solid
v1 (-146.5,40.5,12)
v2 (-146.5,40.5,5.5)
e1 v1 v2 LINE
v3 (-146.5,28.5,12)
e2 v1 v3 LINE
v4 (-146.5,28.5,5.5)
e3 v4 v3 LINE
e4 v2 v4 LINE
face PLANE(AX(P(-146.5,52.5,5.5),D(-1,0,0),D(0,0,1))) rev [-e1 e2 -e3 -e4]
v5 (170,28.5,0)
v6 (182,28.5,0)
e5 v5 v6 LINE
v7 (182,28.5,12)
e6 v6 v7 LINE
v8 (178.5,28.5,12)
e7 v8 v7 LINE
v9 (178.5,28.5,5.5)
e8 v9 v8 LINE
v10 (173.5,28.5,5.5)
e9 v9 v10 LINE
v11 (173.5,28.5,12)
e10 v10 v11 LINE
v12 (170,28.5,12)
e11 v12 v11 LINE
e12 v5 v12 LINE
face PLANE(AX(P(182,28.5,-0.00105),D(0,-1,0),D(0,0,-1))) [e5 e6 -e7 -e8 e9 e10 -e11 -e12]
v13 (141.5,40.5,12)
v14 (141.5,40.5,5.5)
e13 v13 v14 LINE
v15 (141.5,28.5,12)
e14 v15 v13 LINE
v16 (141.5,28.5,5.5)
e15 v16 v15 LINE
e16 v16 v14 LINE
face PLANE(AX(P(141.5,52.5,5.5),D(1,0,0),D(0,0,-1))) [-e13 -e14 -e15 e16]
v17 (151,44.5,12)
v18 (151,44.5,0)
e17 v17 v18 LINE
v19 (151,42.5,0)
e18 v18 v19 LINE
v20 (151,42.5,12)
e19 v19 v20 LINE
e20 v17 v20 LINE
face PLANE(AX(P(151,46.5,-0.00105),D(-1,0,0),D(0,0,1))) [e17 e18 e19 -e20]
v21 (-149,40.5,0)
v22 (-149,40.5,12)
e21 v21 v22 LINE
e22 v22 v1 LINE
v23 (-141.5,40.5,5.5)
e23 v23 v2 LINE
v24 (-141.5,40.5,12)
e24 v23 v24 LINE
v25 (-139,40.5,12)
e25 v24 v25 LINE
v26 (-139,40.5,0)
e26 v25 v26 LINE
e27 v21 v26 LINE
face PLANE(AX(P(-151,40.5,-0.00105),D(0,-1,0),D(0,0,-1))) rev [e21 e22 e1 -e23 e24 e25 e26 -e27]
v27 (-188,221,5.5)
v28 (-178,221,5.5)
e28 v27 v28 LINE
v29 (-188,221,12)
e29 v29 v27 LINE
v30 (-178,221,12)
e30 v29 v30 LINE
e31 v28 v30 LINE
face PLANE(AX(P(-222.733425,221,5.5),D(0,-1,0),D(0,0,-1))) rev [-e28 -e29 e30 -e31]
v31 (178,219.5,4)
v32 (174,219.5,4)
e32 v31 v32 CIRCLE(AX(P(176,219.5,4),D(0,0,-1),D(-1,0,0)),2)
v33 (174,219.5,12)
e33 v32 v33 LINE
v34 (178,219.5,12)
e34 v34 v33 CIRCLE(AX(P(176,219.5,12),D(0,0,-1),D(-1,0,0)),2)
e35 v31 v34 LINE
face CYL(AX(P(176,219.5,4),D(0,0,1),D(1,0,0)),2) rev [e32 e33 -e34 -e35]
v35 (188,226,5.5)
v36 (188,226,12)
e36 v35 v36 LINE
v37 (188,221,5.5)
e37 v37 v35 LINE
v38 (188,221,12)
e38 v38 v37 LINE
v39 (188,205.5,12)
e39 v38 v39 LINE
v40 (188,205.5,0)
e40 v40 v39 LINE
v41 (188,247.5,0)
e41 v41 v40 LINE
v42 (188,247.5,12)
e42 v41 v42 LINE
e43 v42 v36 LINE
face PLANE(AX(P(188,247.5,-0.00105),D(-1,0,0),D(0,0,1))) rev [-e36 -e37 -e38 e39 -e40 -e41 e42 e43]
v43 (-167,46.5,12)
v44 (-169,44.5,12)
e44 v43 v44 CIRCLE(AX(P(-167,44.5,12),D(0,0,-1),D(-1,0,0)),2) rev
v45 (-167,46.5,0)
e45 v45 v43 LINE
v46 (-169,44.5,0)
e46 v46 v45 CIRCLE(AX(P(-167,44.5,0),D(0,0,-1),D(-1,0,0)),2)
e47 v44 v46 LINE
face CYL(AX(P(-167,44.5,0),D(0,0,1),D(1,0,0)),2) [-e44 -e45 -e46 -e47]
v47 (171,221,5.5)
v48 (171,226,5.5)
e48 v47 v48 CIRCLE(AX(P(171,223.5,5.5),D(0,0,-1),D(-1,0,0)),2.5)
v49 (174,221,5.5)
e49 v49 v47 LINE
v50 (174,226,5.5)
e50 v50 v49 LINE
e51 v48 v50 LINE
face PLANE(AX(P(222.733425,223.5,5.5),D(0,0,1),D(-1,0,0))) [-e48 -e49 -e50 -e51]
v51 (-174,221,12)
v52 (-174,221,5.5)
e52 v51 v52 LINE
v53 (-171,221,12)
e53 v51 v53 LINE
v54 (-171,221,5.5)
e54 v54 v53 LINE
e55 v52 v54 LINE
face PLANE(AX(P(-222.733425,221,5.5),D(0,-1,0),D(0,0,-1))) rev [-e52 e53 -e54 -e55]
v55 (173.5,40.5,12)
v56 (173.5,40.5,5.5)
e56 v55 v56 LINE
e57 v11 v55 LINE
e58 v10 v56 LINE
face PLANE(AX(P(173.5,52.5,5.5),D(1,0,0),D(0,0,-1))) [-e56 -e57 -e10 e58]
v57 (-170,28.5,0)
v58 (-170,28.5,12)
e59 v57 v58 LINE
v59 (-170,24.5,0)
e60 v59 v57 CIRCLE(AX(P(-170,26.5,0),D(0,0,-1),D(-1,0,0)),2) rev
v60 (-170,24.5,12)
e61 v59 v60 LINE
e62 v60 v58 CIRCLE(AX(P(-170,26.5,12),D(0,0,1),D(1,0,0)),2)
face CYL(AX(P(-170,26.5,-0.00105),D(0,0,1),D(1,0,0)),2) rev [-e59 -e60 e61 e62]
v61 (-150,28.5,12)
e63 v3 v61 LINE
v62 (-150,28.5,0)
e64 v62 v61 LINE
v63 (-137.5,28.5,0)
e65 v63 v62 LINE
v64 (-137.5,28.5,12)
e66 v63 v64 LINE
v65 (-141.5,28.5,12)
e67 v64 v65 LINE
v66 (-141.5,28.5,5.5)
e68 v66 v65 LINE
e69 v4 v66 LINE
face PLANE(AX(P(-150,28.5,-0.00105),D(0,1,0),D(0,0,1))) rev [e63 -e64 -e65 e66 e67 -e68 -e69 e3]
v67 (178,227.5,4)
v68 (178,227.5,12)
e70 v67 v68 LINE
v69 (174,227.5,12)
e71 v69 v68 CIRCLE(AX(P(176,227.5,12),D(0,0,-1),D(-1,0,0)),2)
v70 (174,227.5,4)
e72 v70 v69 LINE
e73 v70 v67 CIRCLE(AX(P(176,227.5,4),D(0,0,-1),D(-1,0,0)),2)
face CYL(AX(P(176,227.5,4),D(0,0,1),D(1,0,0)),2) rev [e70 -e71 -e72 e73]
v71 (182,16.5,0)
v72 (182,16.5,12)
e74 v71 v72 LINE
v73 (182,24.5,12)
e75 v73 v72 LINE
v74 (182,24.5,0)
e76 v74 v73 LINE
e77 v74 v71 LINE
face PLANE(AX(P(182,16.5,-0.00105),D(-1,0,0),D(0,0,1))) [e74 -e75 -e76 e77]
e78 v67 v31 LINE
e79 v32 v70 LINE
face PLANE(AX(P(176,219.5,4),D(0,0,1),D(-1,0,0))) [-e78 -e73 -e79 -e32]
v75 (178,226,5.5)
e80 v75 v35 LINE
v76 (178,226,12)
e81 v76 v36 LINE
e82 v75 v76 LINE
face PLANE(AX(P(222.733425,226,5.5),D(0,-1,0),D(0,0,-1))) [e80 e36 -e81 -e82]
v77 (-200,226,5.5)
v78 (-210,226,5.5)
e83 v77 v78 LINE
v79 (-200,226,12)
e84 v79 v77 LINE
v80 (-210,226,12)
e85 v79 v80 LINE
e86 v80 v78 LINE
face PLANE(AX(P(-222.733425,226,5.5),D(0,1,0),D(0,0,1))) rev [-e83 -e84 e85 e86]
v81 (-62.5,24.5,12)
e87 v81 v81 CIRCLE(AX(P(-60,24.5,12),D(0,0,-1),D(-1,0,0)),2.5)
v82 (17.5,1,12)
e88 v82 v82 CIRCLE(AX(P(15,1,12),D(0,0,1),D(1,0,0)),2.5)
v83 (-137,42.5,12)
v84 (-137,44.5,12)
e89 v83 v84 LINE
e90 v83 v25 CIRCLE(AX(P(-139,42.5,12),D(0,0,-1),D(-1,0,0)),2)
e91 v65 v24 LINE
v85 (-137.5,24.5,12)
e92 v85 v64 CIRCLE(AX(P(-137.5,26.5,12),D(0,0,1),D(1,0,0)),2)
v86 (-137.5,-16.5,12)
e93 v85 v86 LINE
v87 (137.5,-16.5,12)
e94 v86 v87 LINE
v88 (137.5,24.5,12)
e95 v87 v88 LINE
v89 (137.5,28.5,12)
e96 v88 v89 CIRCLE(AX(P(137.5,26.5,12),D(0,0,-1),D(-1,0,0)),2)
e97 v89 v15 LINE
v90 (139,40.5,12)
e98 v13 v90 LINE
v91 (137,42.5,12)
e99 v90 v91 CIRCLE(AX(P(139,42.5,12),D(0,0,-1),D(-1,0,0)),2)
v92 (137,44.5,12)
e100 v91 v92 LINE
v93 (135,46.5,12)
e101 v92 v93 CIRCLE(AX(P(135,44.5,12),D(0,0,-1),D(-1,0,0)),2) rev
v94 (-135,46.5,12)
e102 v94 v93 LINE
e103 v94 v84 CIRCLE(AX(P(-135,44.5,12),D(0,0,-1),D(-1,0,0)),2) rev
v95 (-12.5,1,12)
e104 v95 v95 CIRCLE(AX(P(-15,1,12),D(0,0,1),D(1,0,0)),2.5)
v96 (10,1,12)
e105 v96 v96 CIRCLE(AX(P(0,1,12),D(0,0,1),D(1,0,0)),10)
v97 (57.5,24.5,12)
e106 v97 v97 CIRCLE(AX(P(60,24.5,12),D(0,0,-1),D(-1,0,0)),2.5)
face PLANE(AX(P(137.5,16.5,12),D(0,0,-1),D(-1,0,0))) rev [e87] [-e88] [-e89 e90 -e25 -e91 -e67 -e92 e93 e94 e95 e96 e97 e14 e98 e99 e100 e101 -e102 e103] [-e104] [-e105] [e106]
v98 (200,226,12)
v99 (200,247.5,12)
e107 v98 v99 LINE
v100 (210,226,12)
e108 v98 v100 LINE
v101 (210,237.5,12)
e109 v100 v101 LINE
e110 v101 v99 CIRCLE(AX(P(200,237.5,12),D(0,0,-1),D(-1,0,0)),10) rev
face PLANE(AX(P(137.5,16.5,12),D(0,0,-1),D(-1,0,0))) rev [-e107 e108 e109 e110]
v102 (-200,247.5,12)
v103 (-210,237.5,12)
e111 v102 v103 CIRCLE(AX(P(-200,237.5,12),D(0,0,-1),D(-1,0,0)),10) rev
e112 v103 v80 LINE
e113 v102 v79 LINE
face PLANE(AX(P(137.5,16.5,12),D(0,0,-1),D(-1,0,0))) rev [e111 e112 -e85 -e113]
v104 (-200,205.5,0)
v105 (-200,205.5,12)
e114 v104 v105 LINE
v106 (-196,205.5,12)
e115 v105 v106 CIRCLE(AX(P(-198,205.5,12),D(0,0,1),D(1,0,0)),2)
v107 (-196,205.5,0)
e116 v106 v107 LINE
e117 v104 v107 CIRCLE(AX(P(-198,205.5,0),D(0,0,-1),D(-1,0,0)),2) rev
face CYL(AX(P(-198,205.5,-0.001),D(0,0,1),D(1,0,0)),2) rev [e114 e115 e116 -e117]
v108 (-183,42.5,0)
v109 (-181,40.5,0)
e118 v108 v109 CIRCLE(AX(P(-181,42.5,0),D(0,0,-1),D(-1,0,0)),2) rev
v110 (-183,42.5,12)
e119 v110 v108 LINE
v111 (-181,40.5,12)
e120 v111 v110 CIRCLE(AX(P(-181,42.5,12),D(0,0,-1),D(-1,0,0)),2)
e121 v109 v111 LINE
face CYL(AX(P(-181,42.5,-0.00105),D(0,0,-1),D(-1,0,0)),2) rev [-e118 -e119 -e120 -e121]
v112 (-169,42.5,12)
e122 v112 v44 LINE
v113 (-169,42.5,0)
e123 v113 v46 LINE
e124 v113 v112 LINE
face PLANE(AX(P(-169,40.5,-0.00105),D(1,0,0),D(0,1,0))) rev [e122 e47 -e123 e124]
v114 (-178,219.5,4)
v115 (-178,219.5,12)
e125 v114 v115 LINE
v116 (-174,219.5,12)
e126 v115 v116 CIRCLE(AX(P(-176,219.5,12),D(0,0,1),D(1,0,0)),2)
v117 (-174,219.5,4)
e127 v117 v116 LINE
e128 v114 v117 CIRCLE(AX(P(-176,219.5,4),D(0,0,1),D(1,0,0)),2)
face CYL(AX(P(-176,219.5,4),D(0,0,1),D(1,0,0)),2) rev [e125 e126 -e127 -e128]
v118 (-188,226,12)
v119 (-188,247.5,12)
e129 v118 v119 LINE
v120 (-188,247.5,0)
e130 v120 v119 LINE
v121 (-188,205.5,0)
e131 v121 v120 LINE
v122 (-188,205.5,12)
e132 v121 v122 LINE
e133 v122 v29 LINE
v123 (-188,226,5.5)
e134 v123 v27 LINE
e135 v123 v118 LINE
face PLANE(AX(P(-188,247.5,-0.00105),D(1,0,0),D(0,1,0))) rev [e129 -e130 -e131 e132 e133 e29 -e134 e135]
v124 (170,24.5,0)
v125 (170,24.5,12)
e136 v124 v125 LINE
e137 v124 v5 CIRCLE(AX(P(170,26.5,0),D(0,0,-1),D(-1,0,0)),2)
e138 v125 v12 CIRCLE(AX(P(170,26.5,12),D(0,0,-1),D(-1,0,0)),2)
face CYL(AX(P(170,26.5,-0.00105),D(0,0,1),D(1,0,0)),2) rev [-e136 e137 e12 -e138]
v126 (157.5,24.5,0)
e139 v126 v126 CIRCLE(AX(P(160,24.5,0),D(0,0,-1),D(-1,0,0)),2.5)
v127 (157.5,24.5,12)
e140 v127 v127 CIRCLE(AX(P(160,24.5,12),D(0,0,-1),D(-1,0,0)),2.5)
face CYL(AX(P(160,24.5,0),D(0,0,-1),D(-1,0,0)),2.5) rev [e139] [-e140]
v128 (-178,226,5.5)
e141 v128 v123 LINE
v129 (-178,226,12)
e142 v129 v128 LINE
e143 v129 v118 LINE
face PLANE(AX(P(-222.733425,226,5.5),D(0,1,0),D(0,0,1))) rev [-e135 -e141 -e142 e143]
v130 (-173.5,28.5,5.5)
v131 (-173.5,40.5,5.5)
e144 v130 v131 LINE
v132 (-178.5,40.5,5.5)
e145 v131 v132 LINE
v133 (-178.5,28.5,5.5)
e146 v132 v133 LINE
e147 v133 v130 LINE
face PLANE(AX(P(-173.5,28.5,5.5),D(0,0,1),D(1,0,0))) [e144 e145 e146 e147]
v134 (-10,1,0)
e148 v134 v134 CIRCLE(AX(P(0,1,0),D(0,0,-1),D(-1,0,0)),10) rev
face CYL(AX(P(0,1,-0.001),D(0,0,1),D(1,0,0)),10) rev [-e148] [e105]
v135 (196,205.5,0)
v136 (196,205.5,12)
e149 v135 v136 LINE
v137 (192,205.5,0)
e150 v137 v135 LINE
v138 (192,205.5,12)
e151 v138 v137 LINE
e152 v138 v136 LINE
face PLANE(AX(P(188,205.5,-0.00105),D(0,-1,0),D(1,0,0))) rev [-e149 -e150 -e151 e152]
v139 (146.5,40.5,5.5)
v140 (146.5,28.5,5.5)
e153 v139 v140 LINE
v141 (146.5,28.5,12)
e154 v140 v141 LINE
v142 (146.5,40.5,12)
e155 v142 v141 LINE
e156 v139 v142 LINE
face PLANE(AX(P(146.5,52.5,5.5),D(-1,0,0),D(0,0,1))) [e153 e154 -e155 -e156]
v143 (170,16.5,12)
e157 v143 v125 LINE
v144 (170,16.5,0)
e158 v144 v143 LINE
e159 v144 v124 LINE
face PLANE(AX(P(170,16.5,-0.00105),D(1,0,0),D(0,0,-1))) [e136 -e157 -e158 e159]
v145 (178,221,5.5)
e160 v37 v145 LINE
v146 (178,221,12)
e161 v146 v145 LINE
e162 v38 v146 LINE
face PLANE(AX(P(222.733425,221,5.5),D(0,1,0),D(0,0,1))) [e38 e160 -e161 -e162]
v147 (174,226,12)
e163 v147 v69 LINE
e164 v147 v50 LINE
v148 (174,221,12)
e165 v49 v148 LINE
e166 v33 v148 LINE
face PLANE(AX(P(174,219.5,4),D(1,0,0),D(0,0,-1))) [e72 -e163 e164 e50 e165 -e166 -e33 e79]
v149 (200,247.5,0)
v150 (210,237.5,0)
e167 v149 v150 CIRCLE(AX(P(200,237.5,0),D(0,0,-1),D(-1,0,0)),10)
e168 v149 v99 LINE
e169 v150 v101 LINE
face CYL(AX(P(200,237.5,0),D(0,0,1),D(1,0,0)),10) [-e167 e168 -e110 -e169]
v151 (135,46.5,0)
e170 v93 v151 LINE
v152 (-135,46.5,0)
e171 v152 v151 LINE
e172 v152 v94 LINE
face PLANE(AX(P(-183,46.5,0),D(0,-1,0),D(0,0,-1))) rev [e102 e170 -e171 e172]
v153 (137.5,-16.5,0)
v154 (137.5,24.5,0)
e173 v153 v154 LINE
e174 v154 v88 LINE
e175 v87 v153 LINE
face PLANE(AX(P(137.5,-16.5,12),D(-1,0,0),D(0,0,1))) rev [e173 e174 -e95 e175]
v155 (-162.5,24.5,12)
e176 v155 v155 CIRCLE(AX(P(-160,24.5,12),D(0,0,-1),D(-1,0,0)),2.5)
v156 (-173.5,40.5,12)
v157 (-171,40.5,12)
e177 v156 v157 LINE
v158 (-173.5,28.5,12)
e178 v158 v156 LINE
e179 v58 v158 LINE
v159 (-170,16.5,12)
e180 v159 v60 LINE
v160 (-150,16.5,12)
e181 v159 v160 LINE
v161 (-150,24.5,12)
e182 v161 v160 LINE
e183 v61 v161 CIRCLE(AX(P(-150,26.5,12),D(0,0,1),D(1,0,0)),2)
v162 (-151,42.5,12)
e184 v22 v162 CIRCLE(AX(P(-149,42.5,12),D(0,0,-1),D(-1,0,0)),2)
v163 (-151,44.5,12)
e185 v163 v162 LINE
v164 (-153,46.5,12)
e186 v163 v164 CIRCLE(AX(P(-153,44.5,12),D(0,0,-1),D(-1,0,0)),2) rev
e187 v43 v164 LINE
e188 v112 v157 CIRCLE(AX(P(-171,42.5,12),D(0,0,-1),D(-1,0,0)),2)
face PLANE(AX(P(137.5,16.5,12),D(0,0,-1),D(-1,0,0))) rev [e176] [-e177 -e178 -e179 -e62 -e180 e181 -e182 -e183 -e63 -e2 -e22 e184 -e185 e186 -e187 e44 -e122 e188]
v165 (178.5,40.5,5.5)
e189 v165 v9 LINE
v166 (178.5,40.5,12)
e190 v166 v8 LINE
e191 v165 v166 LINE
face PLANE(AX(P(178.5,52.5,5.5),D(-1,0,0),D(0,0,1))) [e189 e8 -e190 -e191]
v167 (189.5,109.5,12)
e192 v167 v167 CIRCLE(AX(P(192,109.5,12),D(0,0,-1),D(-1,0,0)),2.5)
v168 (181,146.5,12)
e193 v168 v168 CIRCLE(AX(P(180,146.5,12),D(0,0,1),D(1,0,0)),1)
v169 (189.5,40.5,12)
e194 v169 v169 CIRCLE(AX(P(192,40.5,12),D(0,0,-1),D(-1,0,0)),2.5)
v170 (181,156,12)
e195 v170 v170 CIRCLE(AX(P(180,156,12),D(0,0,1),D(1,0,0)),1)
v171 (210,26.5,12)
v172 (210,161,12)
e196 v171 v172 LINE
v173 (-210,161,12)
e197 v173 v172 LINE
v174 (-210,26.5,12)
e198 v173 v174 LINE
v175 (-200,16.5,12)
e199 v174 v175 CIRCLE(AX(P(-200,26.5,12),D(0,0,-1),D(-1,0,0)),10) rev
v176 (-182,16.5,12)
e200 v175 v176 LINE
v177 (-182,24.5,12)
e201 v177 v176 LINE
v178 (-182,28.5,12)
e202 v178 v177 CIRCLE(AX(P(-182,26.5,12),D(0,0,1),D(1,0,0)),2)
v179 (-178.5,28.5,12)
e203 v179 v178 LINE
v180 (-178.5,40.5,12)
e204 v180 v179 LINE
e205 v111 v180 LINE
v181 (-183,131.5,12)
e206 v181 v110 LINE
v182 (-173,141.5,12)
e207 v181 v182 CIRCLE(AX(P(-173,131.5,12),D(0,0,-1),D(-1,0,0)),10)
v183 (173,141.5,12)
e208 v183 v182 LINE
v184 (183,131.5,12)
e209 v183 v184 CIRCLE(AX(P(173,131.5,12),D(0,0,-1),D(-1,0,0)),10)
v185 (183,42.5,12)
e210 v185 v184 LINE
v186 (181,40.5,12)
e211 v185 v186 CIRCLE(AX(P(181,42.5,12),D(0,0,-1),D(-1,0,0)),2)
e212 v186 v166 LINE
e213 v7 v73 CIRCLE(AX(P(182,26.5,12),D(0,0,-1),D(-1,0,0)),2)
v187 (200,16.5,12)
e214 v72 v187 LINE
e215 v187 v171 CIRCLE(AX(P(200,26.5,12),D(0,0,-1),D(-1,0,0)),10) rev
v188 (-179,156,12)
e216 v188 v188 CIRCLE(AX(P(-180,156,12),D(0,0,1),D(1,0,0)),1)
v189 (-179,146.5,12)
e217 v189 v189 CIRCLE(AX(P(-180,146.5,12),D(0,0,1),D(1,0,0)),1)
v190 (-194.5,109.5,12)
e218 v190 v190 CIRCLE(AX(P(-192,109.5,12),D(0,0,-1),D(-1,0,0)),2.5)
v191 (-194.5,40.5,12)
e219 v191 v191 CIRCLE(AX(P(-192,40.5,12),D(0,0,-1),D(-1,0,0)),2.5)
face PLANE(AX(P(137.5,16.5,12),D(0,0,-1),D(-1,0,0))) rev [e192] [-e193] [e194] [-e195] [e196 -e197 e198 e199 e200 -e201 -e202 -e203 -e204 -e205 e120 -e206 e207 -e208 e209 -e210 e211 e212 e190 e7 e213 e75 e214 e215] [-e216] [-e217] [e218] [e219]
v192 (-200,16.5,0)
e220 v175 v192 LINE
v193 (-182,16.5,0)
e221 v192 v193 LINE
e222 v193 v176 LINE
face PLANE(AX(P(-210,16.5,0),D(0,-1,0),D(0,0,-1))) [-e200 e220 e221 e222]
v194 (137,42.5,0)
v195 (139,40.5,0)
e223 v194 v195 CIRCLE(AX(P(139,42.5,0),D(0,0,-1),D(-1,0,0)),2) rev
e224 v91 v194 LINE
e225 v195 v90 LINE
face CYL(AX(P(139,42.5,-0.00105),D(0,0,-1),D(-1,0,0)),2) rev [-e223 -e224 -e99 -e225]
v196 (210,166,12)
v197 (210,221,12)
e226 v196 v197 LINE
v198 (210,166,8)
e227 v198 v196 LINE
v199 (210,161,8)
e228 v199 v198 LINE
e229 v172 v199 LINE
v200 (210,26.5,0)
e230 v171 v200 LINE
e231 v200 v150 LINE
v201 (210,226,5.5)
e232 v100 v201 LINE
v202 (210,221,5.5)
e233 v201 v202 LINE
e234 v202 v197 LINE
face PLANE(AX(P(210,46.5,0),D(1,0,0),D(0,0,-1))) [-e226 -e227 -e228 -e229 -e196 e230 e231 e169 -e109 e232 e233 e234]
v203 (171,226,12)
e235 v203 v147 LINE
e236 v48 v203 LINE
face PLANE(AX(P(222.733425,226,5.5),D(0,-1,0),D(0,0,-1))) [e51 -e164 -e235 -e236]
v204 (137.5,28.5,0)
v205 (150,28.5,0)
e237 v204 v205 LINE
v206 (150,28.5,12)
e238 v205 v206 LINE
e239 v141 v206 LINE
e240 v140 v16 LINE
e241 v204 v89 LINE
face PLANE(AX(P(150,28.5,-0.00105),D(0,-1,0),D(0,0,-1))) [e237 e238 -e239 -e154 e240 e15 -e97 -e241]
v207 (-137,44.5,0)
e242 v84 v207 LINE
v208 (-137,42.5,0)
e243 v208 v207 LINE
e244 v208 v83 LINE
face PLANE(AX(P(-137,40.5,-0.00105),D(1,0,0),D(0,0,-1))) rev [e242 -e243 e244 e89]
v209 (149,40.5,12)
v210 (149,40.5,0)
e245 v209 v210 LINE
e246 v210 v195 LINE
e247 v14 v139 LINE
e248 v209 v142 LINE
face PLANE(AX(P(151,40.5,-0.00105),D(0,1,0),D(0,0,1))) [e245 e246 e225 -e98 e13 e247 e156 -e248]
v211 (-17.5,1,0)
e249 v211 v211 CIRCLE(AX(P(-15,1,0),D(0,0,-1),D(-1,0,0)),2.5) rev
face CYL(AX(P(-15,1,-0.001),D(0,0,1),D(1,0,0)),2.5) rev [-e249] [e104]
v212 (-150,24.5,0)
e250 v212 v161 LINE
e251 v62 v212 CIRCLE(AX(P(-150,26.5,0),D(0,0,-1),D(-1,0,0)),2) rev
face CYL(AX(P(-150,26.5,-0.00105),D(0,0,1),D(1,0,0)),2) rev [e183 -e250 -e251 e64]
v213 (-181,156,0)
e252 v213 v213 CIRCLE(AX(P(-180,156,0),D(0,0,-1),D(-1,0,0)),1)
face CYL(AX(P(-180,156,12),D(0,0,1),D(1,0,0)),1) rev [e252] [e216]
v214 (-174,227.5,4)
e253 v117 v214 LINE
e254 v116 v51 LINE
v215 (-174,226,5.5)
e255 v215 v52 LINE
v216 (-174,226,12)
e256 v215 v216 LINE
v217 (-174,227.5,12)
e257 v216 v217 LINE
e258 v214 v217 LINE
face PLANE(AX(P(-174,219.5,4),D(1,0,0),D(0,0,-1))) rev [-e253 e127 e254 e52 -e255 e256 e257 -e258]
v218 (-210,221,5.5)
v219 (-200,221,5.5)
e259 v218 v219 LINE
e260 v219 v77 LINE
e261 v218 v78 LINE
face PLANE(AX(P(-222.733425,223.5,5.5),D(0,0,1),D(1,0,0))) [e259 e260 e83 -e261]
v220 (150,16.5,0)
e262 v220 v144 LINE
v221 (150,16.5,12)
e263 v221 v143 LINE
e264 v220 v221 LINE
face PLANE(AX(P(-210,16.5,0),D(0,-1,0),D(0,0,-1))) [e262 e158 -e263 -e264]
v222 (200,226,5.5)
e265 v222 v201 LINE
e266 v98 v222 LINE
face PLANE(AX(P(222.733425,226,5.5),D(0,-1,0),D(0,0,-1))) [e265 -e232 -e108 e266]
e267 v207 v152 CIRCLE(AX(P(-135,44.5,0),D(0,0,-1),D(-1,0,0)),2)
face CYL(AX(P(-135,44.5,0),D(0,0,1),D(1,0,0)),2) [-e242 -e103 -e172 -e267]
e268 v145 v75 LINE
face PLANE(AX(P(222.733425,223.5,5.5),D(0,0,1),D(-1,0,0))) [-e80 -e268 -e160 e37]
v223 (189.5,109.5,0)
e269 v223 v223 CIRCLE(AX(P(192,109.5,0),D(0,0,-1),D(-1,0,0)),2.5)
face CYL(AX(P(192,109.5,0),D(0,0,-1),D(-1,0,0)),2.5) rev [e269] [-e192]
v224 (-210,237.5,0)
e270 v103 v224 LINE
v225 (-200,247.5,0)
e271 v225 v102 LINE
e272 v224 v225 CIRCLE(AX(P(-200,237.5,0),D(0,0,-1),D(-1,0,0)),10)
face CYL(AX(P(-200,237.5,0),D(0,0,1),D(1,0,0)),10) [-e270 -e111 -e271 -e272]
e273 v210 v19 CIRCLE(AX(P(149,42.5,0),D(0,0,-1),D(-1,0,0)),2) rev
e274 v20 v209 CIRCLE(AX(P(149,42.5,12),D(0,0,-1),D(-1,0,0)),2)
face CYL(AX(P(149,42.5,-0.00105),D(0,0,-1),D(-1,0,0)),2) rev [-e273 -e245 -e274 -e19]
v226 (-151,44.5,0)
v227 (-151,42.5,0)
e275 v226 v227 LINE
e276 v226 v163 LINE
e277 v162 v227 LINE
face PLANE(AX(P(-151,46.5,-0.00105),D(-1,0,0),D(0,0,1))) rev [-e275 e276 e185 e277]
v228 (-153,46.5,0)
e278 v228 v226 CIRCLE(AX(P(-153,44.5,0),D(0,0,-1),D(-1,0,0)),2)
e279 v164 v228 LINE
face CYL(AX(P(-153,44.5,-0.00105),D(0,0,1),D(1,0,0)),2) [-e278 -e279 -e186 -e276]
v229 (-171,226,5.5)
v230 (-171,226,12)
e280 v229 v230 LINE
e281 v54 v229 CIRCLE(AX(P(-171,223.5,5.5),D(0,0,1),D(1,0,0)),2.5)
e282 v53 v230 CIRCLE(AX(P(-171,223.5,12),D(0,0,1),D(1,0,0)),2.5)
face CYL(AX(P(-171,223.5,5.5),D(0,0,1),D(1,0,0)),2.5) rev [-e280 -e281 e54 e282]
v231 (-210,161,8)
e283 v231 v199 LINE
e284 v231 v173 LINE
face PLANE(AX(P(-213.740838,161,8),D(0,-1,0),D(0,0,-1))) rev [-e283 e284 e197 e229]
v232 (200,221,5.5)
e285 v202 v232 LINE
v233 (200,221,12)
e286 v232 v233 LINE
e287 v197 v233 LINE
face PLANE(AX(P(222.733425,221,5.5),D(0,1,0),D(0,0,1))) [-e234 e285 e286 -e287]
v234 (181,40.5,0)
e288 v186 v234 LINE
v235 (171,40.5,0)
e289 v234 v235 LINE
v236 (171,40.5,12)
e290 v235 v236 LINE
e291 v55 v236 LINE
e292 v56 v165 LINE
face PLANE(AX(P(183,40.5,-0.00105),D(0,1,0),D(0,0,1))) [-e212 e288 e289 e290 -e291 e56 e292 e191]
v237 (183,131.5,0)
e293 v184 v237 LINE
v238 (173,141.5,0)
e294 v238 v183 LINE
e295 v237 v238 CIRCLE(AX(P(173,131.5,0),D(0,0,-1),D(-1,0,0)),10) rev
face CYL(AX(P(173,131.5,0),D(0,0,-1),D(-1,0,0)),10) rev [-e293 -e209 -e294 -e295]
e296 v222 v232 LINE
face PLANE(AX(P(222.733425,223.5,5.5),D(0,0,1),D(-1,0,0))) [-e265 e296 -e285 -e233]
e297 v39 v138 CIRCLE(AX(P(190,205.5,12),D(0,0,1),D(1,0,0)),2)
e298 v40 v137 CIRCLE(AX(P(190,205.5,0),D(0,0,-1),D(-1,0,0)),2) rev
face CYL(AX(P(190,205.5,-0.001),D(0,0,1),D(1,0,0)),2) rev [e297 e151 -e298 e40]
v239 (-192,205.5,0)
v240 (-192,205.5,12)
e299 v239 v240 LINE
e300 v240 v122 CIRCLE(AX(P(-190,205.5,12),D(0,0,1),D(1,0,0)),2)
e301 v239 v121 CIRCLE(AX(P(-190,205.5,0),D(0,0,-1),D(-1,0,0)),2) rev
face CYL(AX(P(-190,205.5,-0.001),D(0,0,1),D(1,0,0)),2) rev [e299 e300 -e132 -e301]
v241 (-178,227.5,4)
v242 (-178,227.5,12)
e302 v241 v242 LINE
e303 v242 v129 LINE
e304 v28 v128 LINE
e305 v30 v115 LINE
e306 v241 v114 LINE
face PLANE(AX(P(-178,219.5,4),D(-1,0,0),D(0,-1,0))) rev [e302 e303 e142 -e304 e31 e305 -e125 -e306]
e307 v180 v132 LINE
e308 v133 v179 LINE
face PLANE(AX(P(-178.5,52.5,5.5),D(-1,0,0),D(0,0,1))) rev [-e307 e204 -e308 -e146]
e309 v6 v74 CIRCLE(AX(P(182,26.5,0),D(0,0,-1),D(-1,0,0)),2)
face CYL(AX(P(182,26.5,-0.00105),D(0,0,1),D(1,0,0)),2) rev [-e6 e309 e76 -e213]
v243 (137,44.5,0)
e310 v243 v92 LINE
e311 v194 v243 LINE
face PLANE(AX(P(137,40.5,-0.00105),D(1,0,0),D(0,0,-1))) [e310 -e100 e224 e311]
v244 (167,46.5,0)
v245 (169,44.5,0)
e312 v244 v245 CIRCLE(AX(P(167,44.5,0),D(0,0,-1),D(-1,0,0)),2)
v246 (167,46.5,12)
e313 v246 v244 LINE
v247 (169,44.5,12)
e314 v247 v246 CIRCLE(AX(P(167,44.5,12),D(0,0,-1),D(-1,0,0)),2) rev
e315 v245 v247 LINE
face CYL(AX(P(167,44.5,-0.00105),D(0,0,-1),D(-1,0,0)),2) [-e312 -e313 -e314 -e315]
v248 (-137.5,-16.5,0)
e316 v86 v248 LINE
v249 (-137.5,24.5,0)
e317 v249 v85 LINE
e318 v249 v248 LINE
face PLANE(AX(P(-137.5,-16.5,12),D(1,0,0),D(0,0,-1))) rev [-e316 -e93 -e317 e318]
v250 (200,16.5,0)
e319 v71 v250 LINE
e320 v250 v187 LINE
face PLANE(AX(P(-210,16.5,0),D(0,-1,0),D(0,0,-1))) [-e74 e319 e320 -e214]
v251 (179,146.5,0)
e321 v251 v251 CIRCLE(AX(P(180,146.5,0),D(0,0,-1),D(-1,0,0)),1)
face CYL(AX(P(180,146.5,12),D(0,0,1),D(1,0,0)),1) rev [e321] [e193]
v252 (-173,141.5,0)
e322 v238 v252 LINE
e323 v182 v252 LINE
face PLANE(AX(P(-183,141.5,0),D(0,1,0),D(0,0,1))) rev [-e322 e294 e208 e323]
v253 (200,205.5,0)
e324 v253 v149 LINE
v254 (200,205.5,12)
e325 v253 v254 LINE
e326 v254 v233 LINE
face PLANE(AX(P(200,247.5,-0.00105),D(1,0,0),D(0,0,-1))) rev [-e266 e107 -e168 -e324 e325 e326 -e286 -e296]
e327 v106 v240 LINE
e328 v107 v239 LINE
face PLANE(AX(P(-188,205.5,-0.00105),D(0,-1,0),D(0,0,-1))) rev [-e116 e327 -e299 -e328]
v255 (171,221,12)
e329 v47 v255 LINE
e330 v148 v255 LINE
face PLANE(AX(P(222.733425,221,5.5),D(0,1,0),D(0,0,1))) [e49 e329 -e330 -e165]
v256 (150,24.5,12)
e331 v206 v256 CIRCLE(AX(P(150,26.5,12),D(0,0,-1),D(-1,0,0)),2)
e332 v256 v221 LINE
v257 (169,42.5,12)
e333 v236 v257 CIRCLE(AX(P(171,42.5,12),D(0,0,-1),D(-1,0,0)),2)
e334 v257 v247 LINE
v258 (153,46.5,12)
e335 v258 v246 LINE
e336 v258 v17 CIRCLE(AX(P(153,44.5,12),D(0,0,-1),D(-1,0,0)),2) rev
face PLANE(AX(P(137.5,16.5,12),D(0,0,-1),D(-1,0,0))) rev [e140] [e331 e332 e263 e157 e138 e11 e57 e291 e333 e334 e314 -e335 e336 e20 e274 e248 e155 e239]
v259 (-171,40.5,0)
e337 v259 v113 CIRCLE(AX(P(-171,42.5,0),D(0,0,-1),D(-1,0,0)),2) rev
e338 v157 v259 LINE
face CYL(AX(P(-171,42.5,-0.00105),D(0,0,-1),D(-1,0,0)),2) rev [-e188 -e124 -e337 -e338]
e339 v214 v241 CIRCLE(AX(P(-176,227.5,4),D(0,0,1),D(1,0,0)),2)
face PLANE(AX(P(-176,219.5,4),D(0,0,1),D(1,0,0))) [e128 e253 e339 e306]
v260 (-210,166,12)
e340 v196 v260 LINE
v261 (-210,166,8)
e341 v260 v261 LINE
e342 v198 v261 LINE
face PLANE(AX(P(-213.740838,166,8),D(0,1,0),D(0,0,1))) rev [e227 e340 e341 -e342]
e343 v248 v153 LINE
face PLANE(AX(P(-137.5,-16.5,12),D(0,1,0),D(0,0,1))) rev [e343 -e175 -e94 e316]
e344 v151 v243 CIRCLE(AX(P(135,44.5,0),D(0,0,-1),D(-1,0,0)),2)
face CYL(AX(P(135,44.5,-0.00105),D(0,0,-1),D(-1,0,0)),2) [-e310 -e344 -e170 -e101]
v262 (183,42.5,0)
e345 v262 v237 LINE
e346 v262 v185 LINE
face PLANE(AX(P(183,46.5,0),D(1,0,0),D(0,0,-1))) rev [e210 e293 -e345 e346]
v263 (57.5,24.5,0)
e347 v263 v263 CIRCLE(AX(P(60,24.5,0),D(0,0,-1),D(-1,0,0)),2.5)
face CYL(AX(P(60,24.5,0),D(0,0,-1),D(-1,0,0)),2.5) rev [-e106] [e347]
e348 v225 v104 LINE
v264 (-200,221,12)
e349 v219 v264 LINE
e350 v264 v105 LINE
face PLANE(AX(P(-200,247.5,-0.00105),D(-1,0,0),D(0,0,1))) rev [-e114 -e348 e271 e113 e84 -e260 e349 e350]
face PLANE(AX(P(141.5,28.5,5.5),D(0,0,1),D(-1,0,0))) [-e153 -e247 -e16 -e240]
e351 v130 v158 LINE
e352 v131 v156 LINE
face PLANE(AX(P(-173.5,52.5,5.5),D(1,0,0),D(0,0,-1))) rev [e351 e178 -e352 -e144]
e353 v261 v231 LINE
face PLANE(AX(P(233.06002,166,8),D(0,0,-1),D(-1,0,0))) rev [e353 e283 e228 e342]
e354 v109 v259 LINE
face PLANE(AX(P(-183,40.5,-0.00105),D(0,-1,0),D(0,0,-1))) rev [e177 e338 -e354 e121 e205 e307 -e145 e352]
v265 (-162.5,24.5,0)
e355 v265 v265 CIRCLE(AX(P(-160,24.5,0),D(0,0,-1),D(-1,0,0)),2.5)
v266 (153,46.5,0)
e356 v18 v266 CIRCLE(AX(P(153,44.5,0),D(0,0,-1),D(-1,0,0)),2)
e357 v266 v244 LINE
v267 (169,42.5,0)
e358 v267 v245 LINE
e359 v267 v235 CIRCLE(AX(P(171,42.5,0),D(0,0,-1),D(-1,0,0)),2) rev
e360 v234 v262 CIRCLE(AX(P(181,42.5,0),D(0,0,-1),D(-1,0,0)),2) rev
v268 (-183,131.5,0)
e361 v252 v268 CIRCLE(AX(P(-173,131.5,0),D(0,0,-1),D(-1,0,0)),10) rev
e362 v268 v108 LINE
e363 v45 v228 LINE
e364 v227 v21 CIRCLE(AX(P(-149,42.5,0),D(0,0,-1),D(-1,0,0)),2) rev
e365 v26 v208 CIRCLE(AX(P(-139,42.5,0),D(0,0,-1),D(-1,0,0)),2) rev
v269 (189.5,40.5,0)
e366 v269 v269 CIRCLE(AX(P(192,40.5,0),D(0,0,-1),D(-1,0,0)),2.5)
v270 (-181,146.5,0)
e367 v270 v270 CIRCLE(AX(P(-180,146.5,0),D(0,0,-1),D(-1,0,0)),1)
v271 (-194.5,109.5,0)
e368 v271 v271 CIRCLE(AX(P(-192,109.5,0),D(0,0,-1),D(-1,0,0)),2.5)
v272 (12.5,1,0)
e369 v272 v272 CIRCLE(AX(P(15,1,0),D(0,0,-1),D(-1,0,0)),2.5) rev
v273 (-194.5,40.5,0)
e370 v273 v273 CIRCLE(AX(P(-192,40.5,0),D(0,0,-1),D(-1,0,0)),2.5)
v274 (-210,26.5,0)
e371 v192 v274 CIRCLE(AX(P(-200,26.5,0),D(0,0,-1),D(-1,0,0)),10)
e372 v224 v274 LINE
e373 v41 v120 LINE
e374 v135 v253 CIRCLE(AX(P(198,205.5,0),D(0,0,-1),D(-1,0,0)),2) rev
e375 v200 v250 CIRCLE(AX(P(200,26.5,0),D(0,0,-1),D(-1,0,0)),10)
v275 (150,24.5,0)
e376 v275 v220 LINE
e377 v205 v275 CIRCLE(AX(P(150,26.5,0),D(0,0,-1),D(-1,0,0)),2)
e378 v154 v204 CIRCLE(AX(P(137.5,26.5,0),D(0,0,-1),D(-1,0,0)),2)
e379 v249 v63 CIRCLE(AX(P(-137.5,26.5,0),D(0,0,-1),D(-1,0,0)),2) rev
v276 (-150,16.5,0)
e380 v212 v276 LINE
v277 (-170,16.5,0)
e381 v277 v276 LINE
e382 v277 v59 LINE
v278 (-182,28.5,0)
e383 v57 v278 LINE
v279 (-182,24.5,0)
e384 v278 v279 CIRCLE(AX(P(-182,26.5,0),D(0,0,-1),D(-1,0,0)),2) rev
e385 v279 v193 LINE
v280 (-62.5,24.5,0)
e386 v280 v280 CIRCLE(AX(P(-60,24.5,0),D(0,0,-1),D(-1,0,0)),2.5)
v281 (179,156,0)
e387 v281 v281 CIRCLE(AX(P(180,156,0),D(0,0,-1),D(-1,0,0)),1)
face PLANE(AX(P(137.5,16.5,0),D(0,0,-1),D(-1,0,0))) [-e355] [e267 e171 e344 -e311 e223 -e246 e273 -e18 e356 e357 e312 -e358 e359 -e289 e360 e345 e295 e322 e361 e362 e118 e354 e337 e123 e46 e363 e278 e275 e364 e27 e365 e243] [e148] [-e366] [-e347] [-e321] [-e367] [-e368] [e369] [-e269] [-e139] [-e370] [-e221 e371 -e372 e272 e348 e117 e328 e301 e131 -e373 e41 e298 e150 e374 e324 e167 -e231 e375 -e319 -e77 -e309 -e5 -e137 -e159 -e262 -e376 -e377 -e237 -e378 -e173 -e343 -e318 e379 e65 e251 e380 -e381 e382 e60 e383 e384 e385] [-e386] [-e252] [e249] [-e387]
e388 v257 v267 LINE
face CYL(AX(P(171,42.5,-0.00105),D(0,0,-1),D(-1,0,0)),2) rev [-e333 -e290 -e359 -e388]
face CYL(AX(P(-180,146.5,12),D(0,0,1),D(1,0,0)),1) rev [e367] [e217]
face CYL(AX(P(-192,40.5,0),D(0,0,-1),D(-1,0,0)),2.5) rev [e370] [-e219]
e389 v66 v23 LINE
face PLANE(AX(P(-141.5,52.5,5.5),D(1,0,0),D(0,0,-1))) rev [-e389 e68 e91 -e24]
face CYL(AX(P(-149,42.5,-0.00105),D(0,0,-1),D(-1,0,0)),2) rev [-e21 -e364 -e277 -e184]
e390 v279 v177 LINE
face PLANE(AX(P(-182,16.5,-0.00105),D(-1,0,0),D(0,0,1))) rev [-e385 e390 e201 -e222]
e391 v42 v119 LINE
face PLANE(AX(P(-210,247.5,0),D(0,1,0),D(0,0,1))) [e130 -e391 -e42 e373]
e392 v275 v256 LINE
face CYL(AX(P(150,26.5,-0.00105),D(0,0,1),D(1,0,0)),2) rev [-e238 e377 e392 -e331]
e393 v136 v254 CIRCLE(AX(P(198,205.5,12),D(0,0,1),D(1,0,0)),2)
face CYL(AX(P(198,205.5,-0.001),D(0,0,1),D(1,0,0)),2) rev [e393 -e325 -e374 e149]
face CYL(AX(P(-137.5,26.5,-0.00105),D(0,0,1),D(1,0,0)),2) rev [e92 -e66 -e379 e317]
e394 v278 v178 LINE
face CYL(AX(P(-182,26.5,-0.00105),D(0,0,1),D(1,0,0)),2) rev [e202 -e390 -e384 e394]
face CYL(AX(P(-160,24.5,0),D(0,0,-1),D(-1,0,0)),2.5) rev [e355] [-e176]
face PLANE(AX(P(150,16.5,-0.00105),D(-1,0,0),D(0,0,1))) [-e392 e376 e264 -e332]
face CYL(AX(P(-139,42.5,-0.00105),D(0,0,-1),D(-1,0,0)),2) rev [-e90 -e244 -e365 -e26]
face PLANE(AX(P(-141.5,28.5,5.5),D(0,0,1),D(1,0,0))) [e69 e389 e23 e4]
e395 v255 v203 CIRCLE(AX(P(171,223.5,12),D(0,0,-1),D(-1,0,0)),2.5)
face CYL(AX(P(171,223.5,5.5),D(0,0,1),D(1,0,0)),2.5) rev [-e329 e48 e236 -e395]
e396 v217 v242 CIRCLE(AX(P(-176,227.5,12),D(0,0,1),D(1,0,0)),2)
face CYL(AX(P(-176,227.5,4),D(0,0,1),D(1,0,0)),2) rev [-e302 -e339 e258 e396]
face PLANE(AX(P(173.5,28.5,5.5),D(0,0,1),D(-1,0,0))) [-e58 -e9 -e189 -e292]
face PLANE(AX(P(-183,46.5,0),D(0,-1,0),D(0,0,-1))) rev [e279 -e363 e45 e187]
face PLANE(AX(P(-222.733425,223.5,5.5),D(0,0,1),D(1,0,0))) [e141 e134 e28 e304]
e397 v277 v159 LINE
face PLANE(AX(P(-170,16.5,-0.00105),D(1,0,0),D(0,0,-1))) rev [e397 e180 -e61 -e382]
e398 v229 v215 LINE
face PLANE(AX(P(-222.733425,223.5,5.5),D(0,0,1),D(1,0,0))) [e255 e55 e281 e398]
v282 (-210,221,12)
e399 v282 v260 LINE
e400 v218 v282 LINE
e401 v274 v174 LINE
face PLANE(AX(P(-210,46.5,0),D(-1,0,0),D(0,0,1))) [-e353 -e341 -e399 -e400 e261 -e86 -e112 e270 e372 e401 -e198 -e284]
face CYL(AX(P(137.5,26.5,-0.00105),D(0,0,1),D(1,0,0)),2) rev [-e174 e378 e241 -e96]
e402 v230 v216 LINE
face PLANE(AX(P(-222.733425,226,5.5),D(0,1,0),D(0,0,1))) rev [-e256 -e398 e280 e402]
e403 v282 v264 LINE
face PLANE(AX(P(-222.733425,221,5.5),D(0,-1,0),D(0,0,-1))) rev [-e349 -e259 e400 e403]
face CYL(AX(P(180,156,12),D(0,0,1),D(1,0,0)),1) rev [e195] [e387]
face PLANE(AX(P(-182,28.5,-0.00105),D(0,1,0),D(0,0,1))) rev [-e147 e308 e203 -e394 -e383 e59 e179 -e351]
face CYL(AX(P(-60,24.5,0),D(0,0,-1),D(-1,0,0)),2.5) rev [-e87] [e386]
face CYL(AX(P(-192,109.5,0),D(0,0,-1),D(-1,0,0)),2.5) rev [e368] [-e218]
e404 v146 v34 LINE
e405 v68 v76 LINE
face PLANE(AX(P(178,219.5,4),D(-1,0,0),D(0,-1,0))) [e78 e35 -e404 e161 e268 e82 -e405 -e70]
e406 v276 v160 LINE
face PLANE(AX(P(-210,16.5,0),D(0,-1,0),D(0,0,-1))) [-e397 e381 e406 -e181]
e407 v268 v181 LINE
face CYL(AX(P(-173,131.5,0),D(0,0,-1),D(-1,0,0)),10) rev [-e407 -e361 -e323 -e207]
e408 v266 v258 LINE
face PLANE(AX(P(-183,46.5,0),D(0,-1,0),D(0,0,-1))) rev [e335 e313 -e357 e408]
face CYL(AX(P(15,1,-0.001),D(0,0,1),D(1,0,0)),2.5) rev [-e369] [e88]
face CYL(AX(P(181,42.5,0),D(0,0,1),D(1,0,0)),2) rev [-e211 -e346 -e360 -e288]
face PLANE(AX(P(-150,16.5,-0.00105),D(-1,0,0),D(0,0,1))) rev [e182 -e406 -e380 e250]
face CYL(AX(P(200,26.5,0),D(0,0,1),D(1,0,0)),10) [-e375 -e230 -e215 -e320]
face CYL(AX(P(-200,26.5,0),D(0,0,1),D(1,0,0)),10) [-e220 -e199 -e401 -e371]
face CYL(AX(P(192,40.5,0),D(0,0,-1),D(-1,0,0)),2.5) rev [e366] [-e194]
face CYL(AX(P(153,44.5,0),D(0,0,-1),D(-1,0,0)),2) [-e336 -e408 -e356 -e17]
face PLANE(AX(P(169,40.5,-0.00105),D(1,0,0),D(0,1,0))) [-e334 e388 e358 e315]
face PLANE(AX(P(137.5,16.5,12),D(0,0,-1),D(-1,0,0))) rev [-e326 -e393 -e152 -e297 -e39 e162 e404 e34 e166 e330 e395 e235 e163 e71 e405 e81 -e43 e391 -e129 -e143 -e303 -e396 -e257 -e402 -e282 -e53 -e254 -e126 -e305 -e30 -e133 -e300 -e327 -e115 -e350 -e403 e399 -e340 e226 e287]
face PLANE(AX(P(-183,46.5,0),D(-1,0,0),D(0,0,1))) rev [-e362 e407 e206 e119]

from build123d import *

# Parameters (mm, degrees)
SKETCH1_W                = 275
SKETCH1_H                = 33
BOSS_EXTRUDE1_DEPTH      = 12
CUT_EXTRUDE1_REACH       = 141.005
SKETCH2_R                = 10
SKETCH2_R_2              = 2.5
SKETCH3_W                = 366
SKETCH3_H                = 95
BOSS_EXTRUDE2_DEPTH      = 12
CUT_EXTRUDE3_REACH       = 326.808
SKETCH5_W                = 14
SKETCH5_H                = 6
FILLET1_R                = 2
FILLET1_OF_MIRROR2_R     = 2
CUT_EXTRUDE6_REACH       = 326.808
SKETCH8_W                = 12
SKETCH8_H                = 42
F_5_0_5_DIAMETER_HOLE2_D = 5
CUT_EXTRUDE9_DEPTH       = 8
CUT_EXTRUDE10_DEPTH      = 6.5
F_5_0_5_DIAMETER_HOLE1_D = 5
F_2_0_2_DIAMETER_HOLE1_D = 2
SKETCH21_W               = 446.80085783
SKETCH21_H               = 5
CUT_EXTRUDE7_DEPTH       = 4
FILLET2_R                = 10
SKETCH25_W               = 5
SKETCH25_H               = 24
CUT_EXTRUDE11_DEPTH      = 6.5
CUT_EXTRUDE12_REACH      = 326.808
CUT_EXTRUDE13_REACH      = 326.808
SKETCH27_R               = 2


with BuildPart() as part:
    # Sketch1 → Boss-Extrude1 (new body)
    with BuildSketch(Plane.XY):
        Rectangle(SKETCH1_W, SKETCH1_H)
    extrude(amount=BOSS_EXTRUDE1_DEPTH)

    # Sketch2 → Cut-Extrude1 (cut, up to next)
    with BuildSketch(Plane.XY.offset(12), mode=Mode.PRIVATE) as cut_extrude1_sk1:
        with Locations((0, 1)):
            Circle(SKETCH2_R)
    cut_extrude1_tool1 = extrude(cut_extrude1_sk1.sketch, amount=-CUT_EXTRUDE1_REACH, mode=Mode.PRIVATE) & part.part
    # Sketch2 → Cut-Extrude1 (cut, up to next)
    with BuildSketch(Plane.XY.offset(12), mode=Mode.PRIVATE) as cut_extrude1_sk2:
        with Locations((-15, 1)):
            Circle(SKETCH2_R_2)
    cut_extrude1_tool2 = extrude(cut_extrude1_sk2.sketch, amount=-CUT_EXTRUDE1_REACH, mode=Mode.PRIVATE) & part.part
    # Sketch2 → Cut-Extrude1 (cut, up to next)
    with BuildSketch(Plane.XY.offset(12), mode=Mode.PRIVATE) as cut_extrude1_sk3:
        with Locations((15, 1)):
            Circle(SKETCH2_R_2)
    cut_extrude1_tool3 = extrude(cut_extrude1_sk3.sketch, amount=-CUT_EXTRUDE1_REACH, mode=Mode.PRIVATE) & part.part
    add(cut_extrude1_tool1.solids().sort_by_distance((0, 1, 12))[0], mode=Mode.SUBTRACT)
    add(cut_extrude1_tool2.solids().sort_by_distance((-15, 1, 12))[0], mode=Mode.SUBTRACT)
    add(cut_extrude1_tool3.solids().sort_by_distance((15, 1, 12))[0], mode=Mode.SUBTRACT)

    # Sketch3 → Boss-Extrude2 (add)
    with BuildSketch(Plane.XY.offset(12)):
        Polygon((-210, 16.5), (210, 16.5), (210, 46.5), (210, 247.5), (-210, 247.5), (-210, 46.5), align=None)
        with Locations((0, 94)):
            Rectangle(SKETCH3_W, SKETCH3_H, mode=Mode.SUBTRACT)
    extrude(amount=-BOSS_EXTRUDE2_DEPTH)

    # Sketch5 → Cut-Extrude3 (cut, up to next)
    with BuildSketch(Plane.XY.offset(12), mode=Mode.PRIVATE) as cut_extrude3_sk1:
        with Locations((-176, 43.5)):
            Rectangle(SKETCH5_W, SKETCH5_H)
    cut_extrude3_tool1 = extrude(cut_extrude3_sk1.sketch, amount=-CUT_EXTRUDE3_REACH, mode=Mode.PRIVATE) & part.part
    # Sketch5 → Cut-Extrude3 (cut, up to next)
    with BuildSketch(Plane.XY.offset(12), mode=Mode.PRIVATE) as cut_extrude3_sk2:
        with Locations((-144, 43.5)):
            Rectangle(SKETCH5_W, SKETCH5_H)
    cut_extrude3_tool2 = extrude(cut_extrude3_sk2.sketch, amount=-CUT_EXTRUDE3_REACH, mode=Mode.PRIVATE) & part.part
    cut_extrude3_1 = cut_extrude3_tool1.solids().sort_by_distance((-176, 43.5, 12))[0]
    add(cut_extrude3_1, mode=Mode.SUBTRACT)
    cut_extrude3_2 = cut_extrude3_tool2.solids().sort_by_distance((-144, 43.5, 12))[0]
    add(cut_extrude3_2, mode=Mode.SUBTRACT)
    cut_extrude3 = cut_extrude3_1 + cut_extrude3_2  # Cut-Extrude3 as one shape, for the pattern or mirror that repeats it

    # Fillet1
    fillet1_edges = [part.edges().sort_by_distance(p)[0] for p in [
        (-169, 46.5, 6),
        (-169, 40.5, 6),
        (-183, 40.5, 6),
        (-151, 46.5, 6),
        (-137, 46.5, 6),
        (-137, 40.5, 6),
        (-151, 40.5, 6),
    ]]
    fillet(fillet1_edges, radius=FILLET1_R)

    # Mirror2: Cut-Extrude3 across plane
    add(cut_extrude3.mirror(Plane(origin=(0, 0, 0), x_dir=(0, 0, 1), z_dir=(1, 0, 0))), mode=Mode.SUBTRACT)

    # Fillet1 of Mirror2
    fillet1_of_mirror2_edges = [part.edges().sort_by_distance(p)[0] for p in [
        (169, 46.5, 6),
        (169, 40.5, 6),
        (183, 40.5, 6),
        (151, 46.5, 6),
        (137, 46.5, 6),
        (137, 40.5, 6),
        (151, 40.5, 6),
    ]]
    fillet(fillet1_of_mirror2_edges, radius=FILLET1_OF_MIRROR2_R)

    # Sketch8 → Cut-Extrude6 (cut, up to next)
    with BuildSketch(Plane.XY.offset(12), mode=Mode.PRIVATE) as cut_extrude6_sk1:
        with Locations((-194, 226.5)):
            Rectangle(SKETCH8_W, SKETCH8_H)
    cut_extrude6_tool1 = extrude(cut_extrude6_sk1.sketch, amount=-CUT_EXTRUDE6_REACH, mode=Mode.PRIVATE) & part.part
    # Sketch8 → Cut-Extrude6 (cut, up to next)
    with BuildSketch(Plane.XY.offset(12), mode=Mode.PRIVATE) as cut_extrude6_sk2:
        with Locations((194, 226.5)):
            Rectangle(SKETCH8_W, SKETCH8_H)
    cut_extrude6_tool2 = extrude(cut_extrude6_sk2.sketch, amount=-CUT_EXTRUDE6_REACH, mode=Mode.PRIVATE) & part.part
    add(cut_extrude6_tool1.solids().sort_by_distance((-194, 226.5, 12))[0], mode=Mode.SUBTRACT)
    add(cut_extrude6_tool2.solids().sort_by_distance((194, 226.5, 12))[0], mode=Mode.SUBTRACT)

    # Ø5.0 (5) Diameter Hole2 (through all)
    with Locations(Plane(origin=(0, 0, 0), x_dir=(-1, 0, 0), z_dir=(0, 0, -1))):
        with Locations((192, 109.5), (192, 40.5)):
            f_5_0_5_diameter_hole2 = Hole(F_5_0_5_DIAMETER_HOLE2_D / 2)

    # Mirror3: Ø5.0 (5) Diameter Hole2 across plane
    add(f_5_0_5_diameter_hole2.mirror(Plane(origin=(0, 0, 0), x_dir=(0, 0, 1), z_dir=(1, 0, 0))), mode=Mode.SUBTRACT)

    # Sketch23 → Cut-Extrude9 (cut)
    with BuildSketch(Plane.XY.offset(12)):
        with BuildLine():
            Line((-178, 219.5), (-178, 227.5))
            ThreePointArc((-178, 227.5), (-176, 229.5), (-174, 227.5))
            Line((-174, 227.5), (-174, 219.5))
            ThreePointArc((-174, 219.5), (-176, 217.5), (-178, 219.5))
        make_face()
    cut_extrude9 = extrude(amount=-CUT_EXTRUDE9_DEPTH, mode=Mode.SUBTRACT)

    # Sketch24 → Cut-Extrude10 (cut)
    with BuildSketch(Plane.XY.offset(12)):
        with BuildLine():
            Line((-222.733424796, 226), (-171, 226))
            ThreePointArc((-171, 226), (-168.5, 223.5), (-171, 221))
            Line((-171, 221), (-222.733424796, 221))
            ThreePointArc((-222.733424796, 221), (-225.233424796, 223.5), (-222.733424796, 226))
        make_face()
    cut_extrude10 = extrude(amount=-CUT_EXTRUDE10_DEPTH, mode=Mode.SUBTRACT)

    # Ø5.0 (5) Diameter Hole1 (through all)
    with Locations(Plane(origin=(0, 0, 0), x_dir=(-1, 0, 0), z_dir=(0, 0, -1))):
        with Locations((-60, 24.5), (60, 24.5), (160, 24.5), (-160, 24.5)):
            Hole(F_5_0_5_DIAMETER_HOLE1_D / 2)

    # Ø2.0 (2) Diameter Hole1 (through all)
    with Locations(Plane.XY.offset(12)):
        with Locations((-180, 156), (-180, 146.5)):
            f_2_0_2_diameter_hole1 = Hole(F_2_0_2_DIAMETER_HOLE1_D / 2)

    # Mirror4: Cut-Extrude9, Cut-Extrude10, Ø2.0 (2) Diameter Hole1 across plane
    add(cut_extrude9.mirror(Plane(origin=(0, 0, 0), x_dir=(0, 0, 1), z_dir=(1, 0, 0))), mode=Mode.SUBTRACT)
    add(cut_extrude10.mirror(Plane(origin=(0, 0, 0), x_dir=(0, 0, 1), z_dir=(1, 0, 0))), mode=Mode.SUBTRACT)
    add(f_2_0_2_diameter_hole1.mirror(Plane(origin=(0, 0, 0), x_dir=(0, 0, 1), z_dir=(1, 0, 0))), mode=Mode.SUBTRACT)

    # Sketch21 → Cut-Extrude7 (cut)
    with BuildSketch(Plane.XY.offset(12)):
        with Locations((9.659590627, 163.5)):
            Rectangle(SKETCH21_W, SKETCH21_H)
    extrude(amount=-CUT_EXTRUDE7_DEPTH, mode=Mode.SUBTRACT)

    # Fillet2
    fillet2_edges = [part.edges().sort_by_distance(p)[0] for p in [
        (210, 247.5, 6),
        (210, 16.5, 6),
        (-210, 16.5, 6),
        (-210, 247.5, 6),
        (183, 141.5, 6),
        (-183, 141.5, 6),
    ]]
    fillet(fillet2_edges, radius=FILLET2_R - 0.0001)  # a hair under: the kernel refuses the full size

    # Sketch25 → Cut-Extrude11 (cut)
    with BuildSketch(Plane.XY.offset(12)):
        with Locations((-176, 40.5)):
            Rectangle(SKETCH25_W, SKETCH25_H)
        with Locations((-144, 40.5)):
            Rectangle(SKETCH25_W, SKETCH25_H)
    cut_extrude11 = extrude(amount=-CUT_EXTRUDE11_DEPTH, mode=Mode.SUBTRACT)

    # Sketch26 → Cut-Extrude12 (cut, up to next)
    with BuildSketch(Plane.XY.offset(12), mode=Mode.PRIVATE) as cut_extrude12_sk1:
        with BuildLine():
            Line((-182, 16.5), (-170, 16.5))
            Line((-170, 16.5), (-170, 24.5))
            ThreePointArc((-170, 24.5), (-168, 26.5), (-170, 28.5))
            Line((-170, 28.5), (-182, 28.5))
            ThreePointArc((-182, 28.5), (-184, 26.5), (-182, 24.5))
            Line((-182, 24.5), (-182, 16.5))
        make_face()
    cut_extrude12_tool1 = extrude(cut_extrude12_sk1.sketch, amount=-CUT_EXTRUDE12_REACH, mode=Mode.PRIVATE) & part.part
    # Sketch26 → Cut-Extrude12 (cut, up to next)
    with BuildSketch(Plane.XY.offset(12), mode=Mode.PRIVATE) as cut_extrude12_sk2:
        with BuildLine():
            Line((-150, 16.5), (-137.5, 16.5))
            Line((-137.5, 16.5), (-137.5, 24.5))
            ThreePointArc((-137.5, 24.5), (-135.5, 26.5), (-137.5, 28.5))
            Line((-137.5, 28.5), (-150, 28.5))
            ThreePointArc((-150, 28.5), (-152, 26.5), (-150, 24.5))
            Line((-150, 24.5), (-150, 16.5))
        make_face()
    cut_extrude12_tool2 = extrude(cut_extrude12_sk2.sketch, amount=-CUT_EXTRUDE12_REACH, mode=Mode.PRIVATE) & part.part
    cut_extrude12_1 = cut_extrude12_tool1.solids().sort_by_distance((-176, 22.821049, 12))[0]
    add(cut_extrude12_1, mode=Mode.SUBTRACT)
    cut_extrude12_2 = cut_extrude12_tool2.solids().sort_by_distance((-143.75, 22.8092, 12))[0]
    add(cut_extrude12_2, mode=Mode.SUBTRACT)
    cut_extrude12 = cut_extrude12_1 + cut_extrude12_2  # Cut-Extrude12 as one shape, for the pattern or mirror that repeats it

    # Mirror5: Cut-Extrude11, Cut-Extrude12 across plane
    add(cut_extrude11.mirror(Plane(origin=(0, 0, 0), x_dir=(0, 0, 1), z_dir=(1, 0, 0))), mode=Mode.SUBTRACT)
    add(cut_extrude12.mirror(Plane(origin=(0, 0, 0), x_dir=(0, 0, 1), z_dir=(1, 0, 0))), mode=Mode.SUBTRACT)

    # Sketch27 → Cut-Extrude13 (cut, up to next)
    with BuildSketch(Plane.XY.offset(12), mode=Mode.PRIVATE) as cut_extrude13_sk1:
        with Locations((-198, 205.5)):
            Circle(SKETCH27_R)
    cut_extrude13_tool1 = extrude(cut_extrude13_sk1.sketch, amount=-CUT_EXTRUDE13_REACH, mode=Mode.PRIVATE) & part.part
    # Sketch27 → Cut-Extrude13 (cut, up to next)
    with BuildSketch(Plane.XY.offset(12), mode=Mode.PRIVATE) as cut_extrude13_sk2:
        with Locations((-190, 205.5)):
            Circle(SKETCH27_R)
    cut_extrude13_tool2 = extrude(cut_extrude13_sk2.sketch, amount=-CUT_EXTRUDE13_REACH, mode=Mode.PRIVATE) & part.part
    # Sketch27 → Cut-Extrude13 (cut, up to next)
    with BuildSketch(Plane.XY.offset(12), mode=Mode.PRIVATE) as cut_extrude13_sk3:
        with Locations((190, 205.5)):
            Circle(SKETCH27_R)
    cut_extrude13_tool3 = extrude(cut_extrude13_sk3.sketch, amount=-CUT_EXTRUDE13_REACH, mode=Mode.PRIVATE) & part.part
    # Sketch27 → Cut-Extrude13 (cut, up to next)
    with BuildSketch(Plane.XY.offset(12), mode=Mode.PRIVATE) as cut_extrude13_sk4:
        with Locations((198, 205.5)):
            Circle(SKETCH27_R)
    cut_extrude13_tool4 = extrude(cut_extrude13_sk4.sketch, amount=-CUT_EXTRUDE13_REACH, mode=Mode.PRIVATE) & part.part
    add(cut_extrude13_tool1.solids().sort_by_distance((-198, 205.5, 12))[0], mode=Mode.SUBTRACT)
    add(cut_extrude13_tool2.solids().sort_by_distance((-190, 205.5, 12))[0], mode=Mode.SUBTRACT)
    add(cut_extrude13_tool3.solids().sort_by_distance((190, 205.5, 12))[0], mode=Mode.SUBTRACT)
    add(cut_extrude13_tool4.solids().sort_by_distance((198, 205.5, 12))[0], mode=Mode.SUBTRACT)


solid = part.part
